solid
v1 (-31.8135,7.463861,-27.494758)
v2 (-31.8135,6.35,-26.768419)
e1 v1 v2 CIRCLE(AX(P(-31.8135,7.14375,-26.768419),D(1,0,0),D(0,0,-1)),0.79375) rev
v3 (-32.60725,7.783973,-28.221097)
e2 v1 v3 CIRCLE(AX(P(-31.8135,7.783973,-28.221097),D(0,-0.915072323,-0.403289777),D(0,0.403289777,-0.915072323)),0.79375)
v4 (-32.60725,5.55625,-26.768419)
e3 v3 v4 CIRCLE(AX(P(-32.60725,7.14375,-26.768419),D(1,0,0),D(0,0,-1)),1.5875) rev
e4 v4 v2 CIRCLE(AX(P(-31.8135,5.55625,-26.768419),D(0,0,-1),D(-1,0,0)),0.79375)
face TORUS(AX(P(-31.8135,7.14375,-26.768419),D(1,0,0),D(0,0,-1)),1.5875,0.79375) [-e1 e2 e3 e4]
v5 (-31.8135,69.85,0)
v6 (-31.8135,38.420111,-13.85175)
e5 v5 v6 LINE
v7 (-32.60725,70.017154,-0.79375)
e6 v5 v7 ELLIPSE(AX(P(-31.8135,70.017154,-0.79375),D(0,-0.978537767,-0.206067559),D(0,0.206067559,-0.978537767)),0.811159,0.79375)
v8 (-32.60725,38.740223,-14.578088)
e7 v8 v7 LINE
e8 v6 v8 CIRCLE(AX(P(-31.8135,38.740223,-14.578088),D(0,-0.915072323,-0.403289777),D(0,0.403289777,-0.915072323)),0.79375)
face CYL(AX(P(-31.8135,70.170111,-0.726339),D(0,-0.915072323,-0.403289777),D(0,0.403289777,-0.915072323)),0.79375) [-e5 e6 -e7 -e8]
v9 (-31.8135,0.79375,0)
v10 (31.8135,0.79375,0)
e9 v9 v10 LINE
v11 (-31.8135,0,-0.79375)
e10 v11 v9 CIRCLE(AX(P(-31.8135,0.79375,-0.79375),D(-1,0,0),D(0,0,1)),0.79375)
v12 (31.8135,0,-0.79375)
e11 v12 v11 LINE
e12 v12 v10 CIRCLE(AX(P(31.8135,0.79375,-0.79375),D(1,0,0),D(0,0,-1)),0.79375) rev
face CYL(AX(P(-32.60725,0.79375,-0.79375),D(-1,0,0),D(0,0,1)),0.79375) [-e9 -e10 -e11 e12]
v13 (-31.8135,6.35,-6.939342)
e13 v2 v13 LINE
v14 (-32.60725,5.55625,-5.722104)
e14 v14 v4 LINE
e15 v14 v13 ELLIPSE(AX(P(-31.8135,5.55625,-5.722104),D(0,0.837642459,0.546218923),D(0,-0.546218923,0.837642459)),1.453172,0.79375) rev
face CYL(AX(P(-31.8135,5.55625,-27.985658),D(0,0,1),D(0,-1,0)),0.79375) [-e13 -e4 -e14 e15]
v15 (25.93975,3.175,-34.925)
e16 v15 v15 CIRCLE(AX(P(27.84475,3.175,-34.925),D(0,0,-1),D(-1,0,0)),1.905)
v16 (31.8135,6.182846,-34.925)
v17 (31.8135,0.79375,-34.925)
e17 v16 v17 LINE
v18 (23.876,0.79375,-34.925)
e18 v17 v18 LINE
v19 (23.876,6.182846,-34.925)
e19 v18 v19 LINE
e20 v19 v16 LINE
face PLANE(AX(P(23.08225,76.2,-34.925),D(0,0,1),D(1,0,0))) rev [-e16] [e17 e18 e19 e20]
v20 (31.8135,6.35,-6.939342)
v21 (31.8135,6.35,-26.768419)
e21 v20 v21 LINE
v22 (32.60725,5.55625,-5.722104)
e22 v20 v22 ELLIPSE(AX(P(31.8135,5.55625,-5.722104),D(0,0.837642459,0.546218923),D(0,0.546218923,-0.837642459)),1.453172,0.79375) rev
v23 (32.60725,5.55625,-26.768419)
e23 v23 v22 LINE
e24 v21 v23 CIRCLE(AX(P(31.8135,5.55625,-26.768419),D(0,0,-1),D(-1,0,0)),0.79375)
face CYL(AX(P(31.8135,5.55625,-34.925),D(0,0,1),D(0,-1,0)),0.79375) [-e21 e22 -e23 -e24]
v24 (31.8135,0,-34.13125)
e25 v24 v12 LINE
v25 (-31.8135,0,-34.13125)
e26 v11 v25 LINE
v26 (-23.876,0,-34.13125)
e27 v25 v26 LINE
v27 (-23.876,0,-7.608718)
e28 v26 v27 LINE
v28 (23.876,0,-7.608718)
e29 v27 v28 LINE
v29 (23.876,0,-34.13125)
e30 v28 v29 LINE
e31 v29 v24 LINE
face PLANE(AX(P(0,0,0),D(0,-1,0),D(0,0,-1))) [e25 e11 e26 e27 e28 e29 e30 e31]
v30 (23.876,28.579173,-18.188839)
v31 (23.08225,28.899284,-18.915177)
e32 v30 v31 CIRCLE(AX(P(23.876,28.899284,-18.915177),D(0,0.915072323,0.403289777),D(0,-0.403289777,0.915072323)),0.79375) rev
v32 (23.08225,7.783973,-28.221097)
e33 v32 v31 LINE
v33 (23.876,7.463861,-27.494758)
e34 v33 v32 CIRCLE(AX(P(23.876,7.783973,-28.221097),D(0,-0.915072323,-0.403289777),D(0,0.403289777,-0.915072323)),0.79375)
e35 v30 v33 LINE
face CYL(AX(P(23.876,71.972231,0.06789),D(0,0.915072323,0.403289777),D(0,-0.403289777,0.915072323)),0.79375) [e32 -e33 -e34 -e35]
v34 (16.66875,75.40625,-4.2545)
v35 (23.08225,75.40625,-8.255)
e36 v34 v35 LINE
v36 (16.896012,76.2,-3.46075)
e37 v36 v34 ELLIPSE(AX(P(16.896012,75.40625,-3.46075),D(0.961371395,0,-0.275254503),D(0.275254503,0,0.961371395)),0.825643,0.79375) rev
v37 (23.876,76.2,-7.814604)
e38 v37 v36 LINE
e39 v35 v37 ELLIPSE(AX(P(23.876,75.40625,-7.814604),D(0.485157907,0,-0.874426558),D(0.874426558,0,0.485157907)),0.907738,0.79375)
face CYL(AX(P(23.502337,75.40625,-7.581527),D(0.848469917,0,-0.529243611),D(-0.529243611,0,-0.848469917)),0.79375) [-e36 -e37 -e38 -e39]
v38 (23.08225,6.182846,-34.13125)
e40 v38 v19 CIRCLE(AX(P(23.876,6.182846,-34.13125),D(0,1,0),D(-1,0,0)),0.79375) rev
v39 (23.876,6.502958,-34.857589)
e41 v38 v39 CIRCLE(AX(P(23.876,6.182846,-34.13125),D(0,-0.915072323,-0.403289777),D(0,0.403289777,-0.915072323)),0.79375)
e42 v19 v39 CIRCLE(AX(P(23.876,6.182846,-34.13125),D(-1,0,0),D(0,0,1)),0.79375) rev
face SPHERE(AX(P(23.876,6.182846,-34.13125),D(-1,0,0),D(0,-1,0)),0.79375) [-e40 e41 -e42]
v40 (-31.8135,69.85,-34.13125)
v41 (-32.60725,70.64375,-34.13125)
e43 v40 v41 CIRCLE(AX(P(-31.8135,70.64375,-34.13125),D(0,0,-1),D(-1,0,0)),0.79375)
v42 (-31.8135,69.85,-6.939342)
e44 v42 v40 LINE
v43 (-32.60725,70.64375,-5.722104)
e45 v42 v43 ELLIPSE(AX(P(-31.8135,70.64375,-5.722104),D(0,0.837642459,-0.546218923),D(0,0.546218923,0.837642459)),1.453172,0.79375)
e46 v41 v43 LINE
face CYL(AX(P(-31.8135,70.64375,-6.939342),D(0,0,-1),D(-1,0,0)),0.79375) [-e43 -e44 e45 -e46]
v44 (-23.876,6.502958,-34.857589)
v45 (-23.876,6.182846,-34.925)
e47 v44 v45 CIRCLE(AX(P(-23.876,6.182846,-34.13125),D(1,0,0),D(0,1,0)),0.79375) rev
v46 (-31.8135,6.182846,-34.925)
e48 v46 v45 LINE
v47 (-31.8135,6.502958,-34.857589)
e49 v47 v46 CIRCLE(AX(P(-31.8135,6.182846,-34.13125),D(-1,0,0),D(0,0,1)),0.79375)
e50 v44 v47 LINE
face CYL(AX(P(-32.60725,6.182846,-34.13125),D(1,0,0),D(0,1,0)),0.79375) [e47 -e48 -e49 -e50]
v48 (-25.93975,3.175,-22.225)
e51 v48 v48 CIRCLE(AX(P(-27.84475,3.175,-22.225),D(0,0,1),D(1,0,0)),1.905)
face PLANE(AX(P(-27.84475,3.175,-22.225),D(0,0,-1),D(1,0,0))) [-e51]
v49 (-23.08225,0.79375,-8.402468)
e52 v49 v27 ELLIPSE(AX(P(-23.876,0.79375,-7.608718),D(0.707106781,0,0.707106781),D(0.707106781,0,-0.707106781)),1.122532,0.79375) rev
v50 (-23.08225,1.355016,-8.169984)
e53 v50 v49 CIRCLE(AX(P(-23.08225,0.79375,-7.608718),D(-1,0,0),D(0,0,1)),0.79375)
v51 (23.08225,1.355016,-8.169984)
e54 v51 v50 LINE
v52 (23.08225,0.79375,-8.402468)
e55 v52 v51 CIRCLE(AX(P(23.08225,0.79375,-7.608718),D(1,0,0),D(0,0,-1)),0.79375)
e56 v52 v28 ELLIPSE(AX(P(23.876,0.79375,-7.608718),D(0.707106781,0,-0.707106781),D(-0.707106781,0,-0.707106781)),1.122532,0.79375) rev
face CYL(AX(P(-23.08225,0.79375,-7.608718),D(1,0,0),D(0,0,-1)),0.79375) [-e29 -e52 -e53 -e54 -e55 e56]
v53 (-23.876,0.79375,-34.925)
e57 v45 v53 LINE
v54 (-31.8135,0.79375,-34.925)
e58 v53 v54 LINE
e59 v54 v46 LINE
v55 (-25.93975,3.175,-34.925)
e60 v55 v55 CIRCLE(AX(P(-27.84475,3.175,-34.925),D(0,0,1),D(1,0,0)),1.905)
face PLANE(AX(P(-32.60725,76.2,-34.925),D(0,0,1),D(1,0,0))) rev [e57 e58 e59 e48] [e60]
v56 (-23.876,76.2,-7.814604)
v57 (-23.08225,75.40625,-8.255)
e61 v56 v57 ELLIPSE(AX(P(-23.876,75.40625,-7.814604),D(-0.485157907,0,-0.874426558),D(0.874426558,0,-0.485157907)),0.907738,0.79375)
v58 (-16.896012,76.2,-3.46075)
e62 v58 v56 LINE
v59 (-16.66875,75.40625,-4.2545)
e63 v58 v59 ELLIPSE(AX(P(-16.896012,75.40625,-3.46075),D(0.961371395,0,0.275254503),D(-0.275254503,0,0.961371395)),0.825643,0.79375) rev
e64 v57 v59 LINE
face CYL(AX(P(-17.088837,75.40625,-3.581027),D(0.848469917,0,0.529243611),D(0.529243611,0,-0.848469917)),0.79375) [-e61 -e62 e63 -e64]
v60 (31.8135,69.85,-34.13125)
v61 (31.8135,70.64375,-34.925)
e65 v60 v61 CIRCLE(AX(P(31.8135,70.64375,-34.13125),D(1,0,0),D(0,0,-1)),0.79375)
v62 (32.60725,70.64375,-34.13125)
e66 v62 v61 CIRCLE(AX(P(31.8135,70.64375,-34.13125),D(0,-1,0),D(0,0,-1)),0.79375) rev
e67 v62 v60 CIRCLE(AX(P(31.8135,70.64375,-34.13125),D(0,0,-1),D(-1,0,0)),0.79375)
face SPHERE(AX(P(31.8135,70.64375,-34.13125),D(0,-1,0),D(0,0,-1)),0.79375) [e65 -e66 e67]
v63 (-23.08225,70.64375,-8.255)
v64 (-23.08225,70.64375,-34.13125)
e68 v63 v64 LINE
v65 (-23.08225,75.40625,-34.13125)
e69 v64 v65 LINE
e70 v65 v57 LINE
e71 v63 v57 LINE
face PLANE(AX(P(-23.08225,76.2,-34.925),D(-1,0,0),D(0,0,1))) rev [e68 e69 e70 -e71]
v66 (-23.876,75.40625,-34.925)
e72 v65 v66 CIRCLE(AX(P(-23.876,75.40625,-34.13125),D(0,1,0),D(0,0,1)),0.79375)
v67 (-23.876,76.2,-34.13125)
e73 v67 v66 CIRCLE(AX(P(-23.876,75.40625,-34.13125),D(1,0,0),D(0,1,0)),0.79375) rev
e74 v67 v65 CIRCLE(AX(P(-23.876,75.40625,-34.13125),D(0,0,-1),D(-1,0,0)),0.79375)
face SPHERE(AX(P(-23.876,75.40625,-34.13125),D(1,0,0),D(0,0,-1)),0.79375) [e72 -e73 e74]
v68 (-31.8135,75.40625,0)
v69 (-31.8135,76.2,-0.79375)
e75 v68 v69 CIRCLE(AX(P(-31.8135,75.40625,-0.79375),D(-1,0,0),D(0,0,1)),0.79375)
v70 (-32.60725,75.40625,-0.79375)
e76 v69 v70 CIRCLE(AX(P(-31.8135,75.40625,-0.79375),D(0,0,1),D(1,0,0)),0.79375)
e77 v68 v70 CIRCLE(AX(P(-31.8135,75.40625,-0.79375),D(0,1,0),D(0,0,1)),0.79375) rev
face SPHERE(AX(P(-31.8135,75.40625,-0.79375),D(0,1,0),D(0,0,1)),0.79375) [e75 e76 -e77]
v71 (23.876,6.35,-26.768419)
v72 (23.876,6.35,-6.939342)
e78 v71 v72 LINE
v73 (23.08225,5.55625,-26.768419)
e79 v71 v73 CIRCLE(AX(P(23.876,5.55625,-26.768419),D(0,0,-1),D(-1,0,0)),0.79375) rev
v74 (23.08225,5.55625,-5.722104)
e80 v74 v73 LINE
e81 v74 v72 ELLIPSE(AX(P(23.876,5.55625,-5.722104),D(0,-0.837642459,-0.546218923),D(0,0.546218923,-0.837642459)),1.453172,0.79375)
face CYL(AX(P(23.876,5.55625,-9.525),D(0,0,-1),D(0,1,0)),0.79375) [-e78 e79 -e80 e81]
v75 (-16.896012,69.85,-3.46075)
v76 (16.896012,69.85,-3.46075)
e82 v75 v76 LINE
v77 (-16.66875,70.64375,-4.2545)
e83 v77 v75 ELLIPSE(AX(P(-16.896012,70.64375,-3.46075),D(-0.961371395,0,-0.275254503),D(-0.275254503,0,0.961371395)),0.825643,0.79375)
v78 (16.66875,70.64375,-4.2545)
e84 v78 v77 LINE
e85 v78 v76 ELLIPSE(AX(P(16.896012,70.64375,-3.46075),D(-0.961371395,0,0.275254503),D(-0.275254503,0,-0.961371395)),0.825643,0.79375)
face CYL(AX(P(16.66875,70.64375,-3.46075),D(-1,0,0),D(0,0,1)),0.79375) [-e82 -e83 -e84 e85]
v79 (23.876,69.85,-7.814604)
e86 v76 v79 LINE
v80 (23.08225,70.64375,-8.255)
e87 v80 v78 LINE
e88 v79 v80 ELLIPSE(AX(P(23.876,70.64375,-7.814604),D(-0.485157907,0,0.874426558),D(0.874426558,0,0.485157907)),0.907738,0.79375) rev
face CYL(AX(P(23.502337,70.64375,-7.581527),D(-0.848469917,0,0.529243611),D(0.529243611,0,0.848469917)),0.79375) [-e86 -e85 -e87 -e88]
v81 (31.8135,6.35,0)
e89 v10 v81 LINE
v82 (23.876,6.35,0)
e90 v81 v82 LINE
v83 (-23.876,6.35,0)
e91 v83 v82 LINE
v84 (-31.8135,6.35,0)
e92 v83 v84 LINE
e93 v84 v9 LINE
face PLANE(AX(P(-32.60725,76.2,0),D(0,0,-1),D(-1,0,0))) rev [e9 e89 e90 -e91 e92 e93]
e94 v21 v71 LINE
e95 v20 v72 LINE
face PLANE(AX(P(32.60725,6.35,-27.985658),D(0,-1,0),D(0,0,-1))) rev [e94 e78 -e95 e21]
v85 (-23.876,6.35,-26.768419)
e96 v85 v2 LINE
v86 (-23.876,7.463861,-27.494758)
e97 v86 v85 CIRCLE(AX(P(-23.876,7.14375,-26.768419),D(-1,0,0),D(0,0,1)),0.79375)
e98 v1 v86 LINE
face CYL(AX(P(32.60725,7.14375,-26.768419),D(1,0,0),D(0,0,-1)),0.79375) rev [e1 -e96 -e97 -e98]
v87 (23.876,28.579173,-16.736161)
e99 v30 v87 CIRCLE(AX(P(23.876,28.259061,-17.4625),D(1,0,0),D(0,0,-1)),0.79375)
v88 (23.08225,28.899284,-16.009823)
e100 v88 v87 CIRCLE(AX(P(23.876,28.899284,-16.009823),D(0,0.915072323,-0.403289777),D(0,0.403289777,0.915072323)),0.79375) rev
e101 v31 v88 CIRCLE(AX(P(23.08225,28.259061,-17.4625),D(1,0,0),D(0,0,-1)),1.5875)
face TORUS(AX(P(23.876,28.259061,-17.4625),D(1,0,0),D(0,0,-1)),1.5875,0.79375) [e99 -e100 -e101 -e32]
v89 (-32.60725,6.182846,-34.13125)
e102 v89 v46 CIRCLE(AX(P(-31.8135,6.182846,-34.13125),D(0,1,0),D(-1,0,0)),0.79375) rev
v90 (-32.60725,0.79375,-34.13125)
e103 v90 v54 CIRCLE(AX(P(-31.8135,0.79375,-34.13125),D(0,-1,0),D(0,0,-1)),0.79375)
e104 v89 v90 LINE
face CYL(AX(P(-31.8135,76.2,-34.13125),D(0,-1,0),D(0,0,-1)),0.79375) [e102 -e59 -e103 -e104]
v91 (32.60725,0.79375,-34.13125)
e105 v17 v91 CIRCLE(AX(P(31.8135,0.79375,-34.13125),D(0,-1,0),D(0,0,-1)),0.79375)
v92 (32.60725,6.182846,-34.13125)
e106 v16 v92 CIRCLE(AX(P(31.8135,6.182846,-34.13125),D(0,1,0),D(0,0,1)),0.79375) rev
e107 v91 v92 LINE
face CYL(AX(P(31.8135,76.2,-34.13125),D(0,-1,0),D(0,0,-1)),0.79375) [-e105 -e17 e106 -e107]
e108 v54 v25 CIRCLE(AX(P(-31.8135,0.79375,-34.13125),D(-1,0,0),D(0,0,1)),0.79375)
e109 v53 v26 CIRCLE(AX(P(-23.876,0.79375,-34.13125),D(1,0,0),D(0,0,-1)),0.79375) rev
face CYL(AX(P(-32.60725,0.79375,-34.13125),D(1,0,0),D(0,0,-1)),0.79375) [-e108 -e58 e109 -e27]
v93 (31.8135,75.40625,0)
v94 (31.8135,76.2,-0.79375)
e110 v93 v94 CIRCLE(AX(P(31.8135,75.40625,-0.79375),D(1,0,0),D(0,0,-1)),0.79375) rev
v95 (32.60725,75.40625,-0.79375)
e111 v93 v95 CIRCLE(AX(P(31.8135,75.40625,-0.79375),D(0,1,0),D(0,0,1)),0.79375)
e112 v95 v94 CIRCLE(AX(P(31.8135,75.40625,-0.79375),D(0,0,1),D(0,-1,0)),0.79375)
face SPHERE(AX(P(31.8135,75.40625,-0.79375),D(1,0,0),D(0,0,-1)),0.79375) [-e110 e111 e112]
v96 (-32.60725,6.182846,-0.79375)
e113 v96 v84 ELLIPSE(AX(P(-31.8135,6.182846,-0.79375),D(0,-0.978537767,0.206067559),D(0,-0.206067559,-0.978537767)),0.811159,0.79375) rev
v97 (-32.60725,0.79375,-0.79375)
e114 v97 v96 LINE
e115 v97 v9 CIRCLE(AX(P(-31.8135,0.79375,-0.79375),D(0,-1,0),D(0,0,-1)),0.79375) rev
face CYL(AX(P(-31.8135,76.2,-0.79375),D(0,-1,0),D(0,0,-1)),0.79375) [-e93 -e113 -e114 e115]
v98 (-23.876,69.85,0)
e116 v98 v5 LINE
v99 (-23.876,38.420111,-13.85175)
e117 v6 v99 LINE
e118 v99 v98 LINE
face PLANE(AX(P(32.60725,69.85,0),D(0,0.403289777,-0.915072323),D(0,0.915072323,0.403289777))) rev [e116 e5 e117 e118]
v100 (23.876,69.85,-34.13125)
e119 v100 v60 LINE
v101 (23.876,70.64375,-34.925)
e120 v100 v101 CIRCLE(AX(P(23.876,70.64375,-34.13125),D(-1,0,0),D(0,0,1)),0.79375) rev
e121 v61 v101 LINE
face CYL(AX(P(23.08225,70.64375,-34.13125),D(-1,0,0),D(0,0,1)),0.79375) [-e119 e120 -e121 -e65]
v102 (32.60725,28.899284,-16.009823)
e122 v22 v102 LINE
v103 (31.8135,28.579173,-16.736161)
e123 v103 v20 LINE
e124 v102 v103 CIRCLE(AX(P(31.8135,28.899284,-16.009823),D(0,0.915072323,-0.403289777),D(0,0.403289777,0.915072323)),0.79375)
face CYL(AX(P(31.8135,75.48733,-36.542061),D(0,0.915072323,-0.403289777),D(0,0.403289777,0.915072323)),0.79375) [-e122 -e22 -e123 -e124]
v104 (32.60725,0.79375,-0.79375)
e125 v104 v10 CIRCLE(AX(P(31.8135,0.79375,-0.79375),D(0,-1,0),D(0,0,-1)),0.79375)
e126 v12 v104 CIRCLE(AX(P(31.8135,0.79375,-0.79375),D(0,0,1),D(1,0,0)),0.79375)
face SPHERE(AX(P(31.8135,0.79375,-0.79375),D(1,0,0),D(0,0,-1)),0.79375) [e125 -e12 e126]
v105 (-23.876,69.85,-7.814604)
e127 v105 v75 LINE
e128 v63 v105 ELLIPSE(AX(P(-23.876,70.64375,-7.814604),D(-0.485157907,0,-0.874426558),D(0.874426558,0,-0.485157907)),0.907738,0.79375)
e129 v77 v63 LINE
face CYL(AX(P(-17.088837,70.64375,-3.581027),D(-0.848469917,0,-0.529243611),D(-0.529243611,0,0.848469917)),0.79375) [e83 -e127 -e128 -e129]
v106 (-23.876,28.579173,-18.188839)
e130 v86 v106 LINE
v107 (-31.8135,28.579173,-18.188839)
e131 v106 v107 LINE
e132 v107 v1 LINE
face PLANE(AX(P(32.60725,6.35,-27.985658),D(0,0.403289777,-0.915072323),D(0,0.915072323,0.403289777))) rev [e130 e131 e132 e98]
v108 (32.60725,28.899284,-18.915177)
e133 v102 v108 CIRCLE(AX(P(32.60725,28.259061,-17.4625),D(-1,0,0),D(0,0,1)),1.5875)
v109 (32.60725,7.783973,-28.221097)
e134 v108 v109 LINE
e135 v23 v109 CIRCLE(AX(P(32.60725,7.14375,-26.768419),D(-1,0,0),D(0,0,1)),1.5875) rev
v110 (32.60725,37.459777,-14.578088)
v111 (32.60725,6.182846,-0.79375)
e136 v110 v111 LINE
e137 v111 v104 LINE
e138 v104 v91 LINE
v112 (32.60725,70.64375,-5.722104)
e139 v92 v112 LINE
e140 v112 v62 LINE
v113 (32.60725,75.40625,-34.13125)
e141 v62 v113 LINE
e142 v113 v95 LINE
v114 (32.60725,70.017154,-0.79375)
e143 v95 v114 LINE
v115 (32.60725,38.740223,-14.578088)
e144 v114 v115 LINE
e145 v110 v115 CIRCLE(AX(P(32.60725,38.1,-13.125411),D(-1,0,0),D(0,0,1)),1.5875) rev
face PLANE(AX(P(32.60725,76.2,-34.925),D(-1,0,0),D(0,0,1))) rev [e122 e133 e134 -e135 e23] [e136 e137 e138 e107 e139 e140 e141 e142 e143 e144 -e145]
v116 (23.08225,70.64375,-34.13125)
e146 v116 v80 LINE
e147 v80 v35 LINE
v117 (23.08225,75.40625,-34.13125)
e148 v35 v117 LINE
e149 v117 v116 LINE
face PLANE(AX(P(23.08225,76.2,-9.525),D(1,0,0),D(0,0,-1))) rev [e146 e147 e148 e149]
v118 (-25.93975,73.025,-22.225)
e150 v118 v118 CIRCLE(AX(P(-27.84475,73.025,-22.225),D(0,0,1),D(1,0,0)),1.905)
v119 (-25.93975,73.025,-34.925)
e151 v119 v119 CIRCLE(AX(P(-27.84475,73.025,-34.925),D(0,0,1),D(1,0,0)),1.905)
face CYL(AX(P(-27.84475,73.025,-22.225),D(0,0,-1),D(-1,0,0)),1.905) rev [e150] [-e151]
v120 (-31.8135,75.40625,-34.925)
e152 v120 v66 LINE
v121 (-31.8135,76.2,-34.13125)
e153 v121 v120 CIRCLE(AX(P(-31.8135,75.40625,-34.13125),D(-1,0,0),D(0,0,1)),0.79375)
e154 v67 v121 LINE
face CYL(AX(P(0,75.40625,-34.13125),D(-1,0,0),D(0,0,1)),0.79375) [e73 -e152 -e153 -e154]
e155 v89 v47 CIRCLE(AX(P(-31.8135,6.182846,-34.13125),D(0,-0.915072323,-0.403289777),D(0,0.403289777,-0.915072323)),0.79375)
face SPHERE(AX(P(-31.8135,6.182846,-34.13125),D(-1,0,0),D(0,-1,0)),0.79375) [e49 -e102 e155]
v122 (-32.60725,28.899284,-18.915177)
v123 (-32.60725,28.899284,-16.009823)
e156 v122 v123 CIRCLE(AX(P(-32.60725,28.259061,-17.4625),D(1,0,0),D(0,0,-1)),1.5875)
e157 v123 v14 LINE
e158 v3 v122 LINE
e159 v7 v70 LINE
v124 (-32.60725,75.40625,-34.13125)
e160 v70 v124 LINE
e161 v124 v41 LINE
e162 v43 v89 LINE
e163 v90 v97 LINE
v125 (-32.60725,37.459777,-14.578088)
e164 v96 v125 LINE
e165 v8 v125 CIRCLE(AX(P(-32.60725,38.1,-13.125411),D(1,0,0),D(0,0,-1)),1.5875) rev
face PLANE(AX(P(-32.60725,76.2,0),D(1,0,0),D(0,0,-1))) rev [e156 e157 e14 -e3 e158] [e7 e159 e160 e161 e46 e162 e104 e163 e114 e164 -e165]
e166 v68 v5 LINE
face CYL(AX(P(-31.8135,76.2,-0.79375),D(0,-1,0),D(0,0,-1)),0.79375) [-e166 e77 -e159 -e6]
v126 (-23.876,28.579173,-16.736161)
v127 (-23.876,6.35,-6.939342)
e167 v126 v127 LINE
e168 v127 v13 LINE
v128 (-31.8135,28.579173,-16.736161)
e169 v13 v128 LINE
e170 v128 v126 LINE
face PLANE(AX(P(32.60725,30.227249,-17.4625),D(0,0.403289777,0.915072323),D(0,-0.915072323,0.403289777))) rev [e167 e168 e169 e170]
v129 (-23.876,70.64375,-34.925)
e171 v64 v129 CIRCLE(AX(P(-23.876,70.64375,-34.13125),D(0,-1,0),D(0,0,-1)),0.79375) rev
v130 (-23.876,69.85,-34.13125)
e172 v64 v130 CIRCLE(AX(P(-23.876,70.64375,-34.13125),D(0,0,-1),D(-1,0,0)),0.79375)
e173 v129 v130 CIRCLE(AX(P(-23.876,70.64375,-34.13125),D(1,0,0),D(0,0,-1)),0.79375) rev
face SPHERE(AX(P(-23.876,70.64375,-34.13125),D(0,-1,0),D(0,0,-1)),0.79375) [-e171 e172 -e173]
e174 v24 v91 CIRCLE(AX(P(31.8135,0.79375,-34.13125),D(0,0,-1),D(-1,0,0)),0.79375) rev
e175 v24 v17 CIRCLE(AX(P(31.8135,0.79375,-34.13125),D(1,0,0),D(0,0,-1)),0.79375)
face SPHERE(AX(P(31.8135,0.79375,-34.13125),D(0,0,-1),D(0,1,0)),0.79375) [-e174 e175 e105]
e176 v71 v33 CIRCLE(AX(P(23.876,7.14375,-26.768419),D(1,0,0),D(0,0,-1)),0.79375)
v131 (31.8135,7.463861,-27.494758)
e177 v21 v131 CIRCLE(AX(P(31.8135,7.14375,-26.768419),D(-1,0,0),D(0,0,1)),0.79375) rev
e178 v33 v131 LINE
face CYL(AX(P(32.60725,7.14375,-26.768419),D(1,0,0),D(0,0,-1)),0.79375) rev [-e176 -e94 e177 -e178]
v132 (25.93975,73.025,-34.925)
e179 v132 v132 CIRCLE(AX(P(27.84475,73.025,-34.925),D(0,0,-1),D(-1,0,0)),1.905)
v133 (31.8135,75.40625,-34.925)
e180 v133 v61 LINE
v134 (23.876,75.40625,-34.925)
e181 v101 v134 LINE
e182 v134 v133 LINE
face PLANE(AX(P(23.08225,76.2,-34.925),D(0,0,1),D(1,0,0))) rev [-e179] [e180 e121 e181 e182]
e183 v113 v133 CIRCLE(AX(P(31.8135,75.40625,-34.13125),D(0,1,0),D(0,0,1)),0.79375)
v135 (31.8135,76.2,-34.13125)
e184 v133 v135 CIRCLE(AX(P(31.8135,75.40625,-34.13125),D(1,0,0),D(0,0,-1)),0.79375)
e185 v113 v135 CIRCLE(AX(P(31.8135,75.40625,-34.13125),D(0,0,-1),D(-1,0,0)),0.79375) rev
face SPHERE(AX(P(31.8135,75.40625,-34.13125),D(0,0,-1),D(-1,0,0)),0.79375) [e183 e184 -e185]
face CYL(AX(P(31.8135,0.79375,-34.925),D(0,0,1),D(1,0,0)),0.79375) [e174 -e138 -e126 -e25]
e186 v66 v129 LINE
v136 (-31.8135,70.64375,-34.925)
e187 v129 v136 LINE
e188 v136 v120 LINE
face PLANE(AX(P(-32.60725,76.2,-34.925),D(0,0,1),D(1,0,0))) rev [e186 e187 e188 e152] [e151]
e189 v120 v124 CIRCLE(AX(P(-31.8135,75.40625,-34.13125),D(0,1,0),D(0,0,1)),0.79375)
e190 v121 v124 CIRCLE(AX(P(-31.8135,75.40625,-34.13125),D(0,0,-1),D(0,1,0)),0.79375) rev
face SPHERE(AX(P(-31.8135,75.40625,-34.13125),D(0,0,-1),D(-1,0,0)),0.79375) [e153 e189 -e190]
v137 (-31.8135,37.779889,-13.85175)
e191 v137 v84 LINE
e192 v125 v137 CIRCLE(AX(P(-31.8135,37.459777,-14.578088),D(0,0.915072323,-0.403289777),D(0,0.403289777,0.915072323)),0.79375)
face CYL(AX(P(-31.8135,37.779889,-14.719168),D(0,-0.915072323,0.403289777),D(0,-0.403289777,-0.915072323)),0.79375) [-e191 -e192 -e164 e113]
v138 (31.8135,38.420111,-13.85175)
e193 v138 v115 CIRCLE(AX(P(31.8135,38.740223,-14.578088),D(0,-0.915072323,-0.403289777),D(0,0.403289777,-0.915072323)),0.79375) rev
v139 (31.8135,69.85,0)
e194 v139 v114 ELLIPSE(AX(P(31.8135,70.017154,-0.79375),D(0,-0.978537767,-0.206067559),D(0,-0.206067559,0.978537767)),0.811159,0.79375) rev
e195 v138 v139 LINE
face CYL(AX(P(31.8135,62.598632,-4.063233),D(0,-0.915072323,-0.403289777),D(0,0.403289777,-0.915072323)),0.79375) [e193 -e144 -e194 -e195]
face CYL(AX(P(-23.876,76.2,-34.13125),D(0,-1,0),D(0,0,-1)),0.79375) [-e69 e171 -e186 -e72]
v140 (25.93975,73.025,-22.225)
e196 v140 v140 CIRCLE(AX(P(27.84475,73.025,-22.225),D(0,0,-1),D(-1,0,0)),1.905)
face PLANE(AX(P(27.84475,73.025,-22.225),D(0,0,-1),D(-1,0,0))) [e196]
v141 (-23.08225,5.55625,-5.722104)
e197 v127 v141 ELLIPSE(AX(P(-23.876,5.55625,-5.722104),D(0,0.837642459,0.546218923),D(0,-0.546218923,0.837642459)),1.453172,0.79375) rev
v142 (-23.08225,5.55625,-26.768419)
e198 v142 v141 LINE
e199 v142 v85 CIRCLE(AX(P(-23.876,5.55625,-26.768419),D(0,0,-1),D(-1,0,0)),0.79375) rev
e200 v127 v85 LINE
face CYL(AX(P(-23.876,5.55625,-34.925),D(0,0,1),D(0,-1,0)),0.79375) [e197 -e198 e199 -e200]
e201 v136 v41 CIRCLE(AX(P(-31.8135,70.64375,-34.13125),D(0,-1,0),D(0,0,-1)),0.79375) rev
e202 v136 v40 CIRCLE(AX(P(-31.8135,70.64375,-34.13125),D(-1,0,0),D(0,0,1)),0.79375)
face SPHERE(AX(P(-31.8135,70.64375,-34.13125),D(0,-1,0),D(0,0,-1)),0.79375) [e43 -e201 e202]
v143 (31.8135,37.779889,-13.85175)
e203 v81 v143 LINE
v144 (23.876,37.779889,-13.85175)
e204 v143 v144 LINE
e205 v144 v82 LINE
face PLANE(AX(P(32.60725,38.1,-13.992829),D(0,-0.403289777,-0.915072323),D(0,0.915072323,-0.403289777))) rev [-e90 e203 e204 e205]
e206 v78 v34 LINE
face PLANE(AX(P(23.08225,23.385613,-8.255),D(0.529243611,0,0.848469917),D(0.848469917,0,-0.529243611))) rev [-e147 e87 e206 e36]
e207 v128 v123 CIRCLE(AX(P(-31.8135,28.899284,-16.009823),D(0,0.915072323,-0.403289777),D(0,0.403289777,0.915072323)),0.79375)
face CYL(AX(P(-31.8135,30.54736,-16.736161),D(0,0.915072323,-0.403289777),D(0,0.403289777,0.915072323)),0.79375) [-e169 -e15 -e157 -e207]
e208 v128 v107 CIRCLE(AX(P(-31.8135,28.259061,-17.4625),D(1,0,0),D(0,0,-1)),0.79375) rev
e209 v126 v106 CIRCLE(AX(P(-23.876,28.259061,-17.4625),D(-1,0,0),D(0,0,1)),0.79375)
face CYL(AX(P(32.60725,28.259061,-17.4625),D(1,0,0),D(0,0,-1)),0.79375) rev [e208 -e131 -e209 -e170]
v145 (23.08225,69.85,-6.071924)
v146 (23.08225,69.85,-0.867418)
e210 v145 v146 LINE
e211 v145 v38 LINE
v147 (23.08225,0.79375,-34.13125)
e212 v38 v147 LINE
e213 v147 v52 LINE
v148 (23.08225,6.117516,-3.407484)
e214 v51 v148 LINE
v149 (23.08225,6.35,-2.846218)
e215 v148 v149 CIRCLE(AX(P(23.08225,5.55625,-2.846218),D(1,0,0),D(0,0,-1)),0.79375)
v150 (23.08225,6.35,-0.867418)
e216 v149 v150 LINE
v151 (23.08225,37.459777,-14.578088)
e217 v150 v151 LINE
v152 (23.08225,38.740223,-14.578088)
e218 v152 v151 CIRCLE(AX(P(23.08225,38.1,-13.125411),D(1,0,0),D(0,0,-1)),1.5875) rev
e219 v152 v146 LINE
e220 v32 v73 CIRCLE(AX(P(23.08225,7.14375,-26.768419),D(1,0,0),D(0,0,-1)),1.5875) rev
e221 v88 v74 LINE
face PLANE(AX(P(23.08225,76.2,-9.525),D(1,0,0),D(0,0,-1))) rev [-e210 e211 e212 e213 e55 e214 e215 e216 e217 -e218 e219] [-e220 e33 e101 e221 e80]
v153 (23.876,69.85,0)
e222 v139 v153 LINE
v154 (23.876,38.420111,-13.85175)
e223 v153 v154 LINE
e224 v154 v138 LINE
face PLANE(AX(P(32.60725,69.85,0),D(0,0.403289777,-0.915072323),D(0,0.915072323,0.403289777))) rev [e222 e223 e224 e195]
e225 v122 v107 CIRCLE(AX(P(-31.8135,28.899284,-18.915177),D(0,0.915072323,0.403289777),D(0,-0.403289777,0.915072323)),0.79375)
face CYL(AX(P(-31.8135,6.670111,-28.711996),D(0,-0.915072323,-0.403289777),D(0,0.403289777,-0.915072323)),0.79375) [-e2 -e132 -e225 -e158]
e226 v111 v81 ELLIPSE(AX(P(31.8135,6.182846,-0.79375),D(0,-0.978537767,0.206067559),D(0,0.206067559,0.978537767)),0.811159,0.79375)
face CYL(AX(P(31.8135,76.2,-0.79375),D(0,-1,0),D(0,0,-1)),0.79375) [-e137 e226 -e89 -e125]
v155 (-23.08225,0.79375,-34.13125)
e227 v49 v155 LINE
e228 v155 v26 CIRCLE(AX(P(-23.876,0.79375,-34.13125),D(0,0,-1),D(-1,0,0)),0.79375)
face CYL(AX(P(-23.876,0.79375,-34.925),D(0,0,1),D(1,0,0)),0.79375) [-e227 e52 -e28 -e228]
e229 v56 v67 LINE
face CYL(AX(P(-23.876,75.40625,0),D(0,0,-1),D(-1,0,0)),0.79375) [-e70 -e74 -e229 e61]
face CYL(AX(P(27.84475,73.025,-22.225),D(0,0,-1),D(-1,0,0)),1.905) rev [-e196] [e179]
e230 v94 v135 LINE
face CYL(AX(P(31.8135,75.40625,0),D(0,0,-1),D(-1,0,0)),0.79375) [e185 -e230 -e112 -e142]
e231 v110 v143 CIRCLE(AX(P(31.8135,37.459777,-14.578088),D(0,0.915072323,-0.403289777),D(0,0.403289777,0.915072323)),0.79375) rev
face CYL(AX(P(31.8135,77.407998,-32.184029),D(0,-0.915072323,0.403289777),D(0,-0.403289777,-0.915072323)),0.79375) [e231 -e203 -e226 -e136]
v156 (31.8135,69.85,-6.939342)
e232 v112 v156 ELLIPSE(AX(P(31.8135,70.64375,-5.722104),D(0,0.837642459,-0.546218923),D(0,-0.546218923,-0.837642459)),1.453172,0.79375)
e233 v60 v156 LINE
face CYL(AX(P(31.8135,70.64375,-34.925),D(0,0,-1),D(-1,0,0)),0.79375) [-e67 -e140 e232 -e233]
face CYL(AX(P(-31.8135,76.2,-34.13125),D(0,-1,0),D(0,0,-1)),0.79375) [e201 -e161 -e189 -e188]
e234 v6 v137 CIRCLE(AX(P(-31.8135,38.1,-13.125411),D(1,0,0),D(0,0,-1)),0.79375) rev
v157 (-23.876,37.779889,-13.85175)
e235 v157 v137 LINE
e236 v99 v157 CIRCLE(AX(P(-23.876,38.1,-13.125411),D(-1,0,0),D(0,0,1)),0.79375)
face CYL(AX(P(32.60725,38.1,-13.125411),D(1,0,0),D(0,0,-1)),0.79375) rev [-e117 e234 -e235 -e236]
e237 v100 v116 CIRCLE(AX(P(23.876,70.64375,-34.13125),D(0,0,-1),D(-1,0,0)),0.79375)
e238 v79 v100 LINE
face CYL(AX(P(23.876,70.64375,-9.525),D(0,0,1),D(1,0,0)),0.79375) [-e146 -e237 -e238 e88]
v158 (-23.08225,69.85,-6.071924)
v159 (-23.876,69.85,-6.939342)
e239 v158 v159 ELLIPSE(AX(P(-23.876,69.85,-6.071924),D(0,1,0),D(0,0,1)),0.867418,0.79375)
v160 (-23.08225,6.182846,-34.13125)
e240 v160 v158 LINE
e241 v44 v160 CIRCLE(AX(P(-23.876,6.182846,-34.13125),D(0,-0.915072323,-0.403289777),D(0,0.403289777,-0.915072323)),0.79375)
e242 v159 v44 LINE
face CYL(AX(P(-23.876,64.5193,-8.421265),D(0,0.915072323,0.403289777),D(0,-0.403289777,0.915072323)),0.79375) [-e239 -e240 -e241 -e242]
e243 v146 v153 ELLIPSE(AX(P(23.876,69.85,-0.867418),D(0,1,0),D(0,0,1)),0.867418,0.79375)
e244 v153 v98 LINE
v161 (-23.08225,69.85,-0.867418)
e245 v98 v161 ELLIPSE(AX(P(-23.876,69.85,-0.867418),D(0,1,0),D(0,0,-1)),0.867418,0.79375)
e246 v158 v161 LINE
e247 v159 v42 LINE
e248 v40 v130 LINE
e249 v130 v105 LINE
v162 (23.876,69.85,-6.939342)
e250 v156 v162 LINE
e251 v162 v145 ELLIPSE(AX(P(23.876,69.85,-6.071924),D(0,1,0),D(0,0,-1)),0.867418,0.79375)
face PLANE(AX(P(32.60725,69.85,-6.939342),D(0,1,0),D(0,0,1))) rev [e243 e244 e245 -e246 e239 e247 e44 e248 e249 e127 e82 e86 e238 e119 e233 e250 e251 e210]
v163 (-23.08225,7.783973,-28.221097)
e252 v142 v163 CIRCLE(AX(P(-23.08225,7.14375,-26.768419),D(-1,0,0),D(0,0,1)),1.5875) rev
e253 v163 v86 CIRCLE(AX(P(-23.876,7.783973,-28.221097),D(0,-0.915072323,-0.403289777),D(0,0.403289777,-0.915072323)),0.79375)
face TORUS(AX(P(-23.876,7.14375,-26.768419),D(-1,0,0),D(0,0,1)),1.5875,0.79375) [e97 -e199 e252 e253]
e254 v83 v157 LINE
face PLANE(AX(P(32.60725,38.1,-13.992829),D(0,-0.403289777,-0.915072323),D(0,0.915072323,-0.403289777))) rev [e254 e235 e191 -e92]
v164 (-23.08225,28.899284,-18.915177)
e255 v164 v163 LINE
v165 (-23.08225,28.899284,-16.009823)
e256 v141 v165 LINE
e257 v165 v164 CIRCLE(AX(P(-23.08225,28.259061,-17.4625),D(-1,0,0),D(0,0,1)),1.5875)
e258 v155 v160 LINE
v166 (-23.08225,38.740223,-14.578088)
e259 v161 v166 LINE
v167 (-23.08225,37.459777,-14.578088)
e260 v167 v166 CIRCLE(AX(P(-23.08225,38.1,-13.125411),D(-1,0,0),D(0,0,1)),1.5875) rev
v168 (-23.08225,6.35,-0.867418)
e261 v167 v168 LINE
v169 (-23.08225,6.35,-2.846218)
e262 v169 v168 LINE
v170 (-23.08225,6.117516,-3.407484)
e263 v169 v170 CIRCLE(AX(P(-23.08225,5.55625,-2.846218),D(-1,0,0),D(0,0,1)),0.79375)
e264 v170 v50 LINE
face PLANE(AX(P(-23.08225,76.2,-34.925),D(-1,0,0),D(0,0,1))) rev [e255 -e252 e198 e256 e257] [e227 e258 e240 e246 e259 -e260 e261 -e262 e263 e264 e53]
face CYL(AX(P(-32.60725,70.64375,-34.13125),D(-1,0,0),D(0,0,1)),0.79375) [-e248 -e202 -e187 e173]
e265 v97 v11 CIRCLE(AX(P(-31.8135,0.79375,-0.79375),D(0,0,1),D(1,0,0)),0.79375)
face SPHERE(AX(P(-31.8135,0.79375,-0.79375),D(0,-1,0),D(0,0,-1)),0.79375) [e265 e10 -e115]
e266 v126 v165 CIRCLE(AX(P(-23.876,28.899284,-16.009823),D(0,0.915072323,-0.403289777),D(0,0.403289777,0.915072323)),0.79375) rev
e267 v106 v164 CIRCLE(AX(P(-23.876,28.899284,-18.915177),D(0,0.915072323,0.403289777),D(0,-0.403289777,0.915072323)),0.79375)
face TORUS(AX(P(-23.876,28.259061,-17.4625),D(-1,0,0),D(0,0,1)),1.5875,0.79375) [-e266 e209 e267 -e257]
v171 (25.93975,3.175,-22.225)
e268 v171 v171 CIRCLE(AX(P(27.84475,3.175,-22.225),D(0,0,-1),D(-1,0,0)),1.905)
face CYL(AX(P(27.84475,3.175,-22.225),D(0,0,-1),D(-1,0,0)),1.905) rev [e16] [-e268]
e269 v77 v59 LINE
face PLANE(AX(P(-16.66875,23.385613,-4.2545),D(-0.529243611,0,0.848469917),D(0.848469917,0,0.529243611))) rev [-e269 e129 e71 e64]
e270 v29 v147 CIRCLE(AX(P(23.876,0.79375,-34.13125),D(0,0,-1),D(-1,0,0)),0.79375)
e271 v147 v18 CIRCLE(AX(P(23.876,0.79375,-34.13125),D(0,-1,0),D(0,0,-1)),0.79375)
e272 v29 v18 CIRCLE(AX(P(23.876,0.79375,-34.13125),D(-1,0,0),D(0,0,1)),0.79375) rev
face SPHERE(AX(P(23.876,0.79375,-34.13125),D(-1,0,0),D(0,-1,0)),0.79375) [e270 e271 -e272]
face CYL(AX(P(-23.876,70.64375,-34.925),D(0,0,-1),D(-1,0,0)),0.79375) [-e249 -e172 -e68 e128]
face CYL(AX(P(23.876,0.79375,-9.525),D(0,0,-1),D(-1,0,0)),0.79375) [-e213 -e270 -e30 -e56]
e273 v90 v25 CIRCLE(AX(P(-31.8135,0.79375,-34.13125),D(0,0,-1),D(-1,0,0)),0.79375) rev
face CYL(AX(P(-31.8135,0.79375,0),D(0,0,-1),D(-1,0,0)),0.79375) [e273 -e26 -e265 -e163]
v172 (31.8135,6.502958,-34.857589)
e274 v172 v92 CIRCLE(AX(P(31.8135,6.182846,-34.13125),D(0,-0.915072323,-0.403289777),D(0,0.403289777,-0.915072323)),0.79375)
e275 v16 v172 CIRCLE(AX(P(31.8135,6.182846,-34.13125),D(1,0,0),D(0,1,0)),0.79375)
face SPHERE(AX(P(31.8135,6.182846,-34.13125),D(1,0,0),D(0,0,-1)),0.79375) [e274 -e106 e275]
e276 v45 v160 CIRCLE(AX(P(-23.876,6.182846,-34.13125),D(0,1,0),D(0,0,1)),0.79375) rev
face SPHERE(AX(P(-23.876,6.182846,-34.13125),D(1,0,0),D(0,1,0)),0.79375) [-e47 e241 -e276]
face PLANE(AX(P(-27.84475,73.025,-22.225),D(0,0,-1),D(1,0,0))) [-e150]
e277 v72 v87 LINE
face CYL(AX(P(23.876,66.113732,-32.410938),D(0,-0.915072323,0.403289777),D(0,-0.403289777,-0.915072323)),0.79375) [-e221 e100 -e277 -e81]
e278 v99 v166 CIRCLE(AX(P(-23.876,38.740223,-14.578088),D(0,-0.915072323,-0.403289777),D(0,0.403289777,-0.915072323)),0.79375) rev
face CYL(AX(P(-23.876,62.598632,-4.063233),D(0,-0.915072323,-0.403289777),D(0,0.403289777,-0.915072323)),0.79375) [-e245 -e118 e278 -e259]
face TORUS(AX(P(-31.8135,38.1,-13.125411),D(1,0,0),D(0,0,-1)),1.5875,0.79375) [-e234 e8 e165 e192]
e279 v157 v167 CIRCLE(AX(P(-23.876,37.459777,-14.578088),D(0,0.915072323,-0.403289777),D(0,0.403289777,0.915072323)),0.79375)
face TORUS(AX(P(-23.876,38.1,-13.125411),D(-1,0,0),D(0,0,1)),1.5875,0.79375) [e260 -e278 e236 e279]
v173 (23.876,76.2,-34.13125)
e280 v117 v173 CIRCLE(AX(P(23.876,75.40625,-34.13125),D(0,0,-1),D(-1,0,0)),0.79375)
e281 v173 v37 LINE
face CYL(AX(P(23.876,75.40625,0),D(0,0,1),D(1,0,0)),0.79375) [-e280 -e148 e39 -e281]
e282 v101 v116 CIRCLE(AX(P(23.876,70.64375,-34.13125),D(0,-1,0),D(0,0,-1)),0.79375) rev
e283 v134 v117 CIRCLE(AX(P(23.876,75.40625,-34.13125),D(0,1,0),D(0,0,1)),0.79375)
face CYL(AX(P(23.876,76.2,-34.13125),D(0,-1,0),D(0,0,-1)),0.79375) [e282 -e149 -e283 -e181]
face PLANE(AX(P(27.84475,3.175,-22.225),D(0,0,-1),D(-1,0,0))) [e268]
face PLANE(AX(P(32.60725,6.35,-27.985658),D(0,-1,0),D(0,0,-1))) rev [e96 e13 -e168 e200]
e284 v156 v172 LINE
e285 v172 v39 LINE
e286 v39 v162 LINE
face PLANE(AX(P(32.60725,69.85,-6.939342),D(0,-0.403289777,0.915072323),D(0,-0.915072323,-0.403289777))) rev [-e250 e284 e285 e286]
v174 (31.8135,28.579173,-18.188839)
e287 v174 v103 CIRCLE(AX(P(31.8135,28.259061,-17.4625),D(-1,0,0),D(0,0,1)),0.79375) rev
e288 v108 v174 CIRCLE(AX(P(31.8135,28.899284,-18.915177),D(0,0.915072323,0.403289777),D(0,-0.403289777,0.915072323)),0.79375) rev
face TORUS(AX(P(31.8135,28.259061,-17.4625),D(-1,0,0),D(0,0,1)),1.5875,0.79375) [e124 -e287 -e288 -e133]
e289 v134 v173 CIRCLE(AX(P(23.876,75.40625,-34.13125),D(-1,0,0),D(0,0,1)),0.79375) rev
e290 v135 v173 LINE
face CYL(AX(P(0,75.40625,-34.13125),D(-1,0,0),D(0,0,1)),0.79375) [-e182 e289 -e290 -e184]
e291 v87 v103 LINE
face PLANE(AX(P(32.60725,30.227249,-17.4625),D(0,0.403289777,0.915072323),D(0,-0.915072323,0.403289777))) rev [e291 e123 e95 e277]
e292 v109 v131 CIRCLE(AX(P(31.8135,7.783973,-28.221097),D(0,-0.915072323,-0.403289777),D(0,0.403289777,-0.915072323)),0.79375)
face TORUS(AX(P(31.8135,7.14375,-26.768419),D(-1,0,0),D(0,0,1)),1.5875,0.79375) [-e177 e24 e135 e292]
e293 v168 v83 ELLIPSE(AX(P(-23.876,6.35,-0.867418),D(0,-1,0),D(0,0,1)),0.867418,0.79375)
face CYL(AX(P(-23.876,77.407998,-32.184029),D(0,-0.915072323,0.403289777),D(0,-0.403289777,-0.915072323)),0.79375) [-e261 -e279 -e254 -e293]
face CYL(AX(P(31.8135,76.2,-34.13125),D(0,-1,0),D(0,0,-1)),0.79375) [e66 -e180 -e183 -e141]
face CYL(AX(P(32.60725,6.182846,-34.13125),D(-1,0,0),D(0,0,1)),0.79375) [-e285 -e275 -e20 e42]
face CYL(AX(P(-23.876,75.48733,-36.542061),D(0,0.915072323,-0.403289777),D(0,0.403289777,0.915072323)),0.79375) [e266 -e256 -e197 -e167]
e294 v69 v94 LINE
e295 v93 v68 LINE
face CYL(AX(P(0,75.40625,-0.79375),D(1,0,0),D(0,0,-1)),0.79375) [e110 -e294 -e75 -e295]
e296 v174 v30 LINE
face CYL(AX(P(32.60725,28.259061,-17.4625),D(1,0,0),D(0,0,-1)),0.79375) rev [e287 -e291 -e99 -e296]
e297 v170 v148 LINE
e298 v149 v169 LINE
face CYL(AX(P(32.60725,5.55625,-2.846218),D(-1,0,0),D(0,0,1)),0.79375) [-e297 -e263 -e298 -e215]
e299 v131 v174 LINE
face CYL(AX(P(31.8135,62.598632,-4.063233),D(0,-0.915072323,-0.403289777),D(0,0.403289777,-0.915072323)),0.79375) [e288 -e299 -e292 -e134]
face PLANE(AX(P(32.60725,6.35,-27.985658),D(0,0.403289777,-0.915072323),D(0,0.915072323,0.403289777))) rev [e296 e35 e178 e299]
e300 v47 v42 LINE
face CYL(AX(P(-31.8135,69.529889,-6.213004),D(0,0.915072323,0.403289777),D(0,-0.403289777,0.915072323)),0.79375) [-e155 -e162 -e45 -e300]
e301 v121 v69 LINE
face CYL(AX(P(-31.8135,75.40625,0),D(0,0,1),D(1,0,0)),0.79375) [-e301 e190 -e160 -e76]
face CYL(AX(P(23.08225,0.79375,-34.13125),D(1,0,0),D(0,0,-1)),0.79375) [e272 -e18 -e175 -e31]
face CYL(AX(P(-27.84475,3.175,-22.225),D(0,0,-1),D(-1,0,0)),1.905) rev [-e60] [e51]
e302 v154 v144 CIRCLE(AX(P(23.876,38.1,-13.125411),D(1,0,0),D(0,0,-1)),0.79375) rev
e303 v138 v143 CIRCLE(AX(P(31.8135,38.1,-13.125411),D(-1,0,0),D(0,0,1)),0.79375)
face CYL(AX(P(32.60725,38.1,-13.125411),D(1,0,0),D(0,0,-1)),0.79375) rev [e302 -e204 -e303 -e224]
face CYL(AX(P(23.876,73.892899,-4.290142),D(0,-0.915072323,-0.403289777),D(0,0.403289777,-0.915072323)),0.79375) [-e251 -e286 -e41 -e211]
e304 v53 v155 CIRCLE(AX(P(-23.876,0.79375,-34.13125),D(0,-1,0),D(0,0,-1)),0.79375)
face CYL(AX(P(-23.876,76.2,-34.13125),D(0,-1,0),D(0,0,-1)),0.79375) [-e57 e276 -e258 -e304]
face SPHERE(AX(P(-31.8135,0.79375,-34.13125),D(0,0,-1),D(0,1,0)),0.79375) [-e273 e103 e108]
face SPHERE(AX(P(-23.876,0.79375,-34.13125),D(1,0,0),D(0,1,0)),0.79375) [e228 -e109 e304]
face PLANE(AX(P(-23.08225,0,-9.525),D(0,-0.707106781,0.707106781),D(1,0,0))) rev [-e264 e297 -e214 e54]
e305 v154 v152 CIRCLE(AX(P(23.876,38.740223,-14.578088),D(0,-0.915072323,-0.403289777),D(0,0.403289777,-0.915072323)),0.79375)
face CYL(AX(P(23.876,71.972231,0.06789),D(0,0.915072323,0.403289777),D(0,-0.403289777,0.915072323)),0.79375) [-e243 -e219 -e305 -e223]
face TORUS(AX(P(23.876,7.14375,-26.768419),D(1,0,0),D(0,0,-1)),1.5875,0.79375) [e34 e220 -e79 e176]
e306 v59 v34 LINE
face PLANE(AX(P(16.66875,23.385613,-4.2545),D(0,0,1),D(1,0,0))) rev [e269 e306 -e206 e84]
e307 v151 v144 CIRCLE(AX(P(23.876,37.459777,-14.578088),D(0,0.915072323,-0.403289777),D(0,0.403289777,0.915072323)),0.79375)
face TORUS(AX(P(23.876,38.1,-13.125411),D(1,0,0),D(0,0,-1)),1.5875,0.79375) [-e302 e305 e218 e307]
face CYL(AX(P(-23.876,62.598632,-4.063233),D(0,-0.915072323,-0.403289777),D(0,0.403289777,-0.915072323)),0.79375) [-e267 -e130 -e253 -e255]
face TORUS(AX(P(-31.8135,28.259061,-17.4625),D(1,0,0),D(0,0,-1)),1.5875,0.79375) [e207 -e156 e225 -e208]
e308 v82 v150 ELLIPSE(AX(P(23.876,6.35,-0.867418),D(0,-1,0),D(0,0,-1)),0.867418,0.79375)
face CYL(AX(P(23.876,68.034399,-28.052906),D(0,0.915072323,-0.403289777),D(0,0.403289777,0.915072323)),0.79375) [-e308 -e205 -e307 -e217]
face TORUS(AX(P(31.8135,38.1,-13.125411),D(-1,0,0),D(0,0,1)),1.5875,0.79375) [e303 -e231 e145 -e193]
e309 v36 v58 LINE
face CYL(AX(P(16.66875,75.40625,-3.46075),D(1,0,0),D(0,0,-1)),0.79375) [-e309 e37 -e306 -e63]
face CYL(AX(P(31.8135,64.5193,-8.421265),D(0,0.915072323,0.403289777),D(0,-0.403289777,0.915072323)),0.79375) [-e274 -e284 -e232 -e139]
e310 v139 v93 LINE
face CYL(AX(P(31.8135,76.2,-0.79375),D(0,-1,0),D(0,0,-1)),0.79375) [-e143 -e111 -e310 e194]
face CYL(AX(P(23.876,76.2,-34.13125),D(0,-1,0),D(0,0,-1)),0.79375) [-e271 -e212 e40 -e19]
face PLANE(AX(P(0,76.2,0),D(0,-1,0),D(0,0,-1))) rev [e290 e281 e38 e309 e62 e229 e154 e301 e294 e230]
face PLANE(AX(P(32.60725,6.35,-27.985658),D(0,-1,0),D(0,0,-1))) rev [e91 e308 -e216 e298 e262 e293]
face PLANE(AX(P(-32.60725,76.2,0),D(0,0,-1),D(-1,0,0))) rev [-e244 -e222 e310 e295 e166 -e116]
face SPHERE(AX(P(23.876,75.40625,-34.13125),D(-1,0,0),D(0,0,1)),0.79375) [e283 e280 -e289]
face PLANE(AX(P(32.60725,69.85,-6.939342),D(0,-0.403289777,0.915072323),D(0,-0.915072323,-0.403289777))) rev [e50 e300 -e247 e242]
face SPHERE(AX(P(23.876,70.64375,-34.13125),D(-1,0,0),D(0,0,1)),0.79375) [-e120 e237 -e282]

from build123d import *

# Parameters (mm, degrees)
BOSS_EXTRUDE1_DEPTH = 76.2
CUT_EXTRUDE2_DEPTH  = 107.203232697
SKETCH6_W           = 46.1645
SKETCH6_H           = 63.5
CUT_EXTRUDE3_DEPTH  = 90.941249589
CHAMFER1_SIZE       = 6.35
SKETCH3_R           = 1.905
CUT_EXTRUDE1_DEPTH  = 12.7
CUT_EXTRUDE4_DEPTH  = 6.35
FILLET1_R           = 0.79375


with BuildPart() as part:
    # Sketch2 → Boss-Extrude1 (new body)
    with BuildSketch(Plane(origin=(0, 0, 0), x_dir=(1, 0, 0), z_dir=(0, 1, 0))):
        Polygon((-32.60725, 0), (32.60725, 0), (32.60725, 34.925), (23.08225, 34.925), (23.08225, 9.525), (-23.08225, 9.525), (-23.08225, 34.925), (-32.60725, 34.925), align=None)
    extrude(amount=BOSS_EXTRUDE1_DEPTH)

    # Sketch5 → Cut-Extrude2 (cut, through all)
    with BuildSketch(Plane.ZY.offset(32.60725)):
        Polygon((-34.925, 38.1), (-34.925, 69.85), (-6.939342218, 69.85), (-34.925, 6.35), align=None)
        Polygon((-27.985657782, 6.35), (-17.4625, 30.227248996), (-6.939342218, 6.35), align=None)
        Polygon((0, 69.85), (0, 6.35), (-13.992828891, 38.1), align=None)
    extrude(amount=-CUT_EXTRUDE2_DEPTH, mode=Mode.SUBTRACT)

    # Sketch6 → Cut-Extrude3 (cut, through all)
    with BuildSketch(Plane.XY):
        with Locations((0, 38.1)):
            Rectangle(SKETCH6_W, SKETCH6_H)
    extrude(amount=-CUT_EXTRUDE3_DEPTH, mode=Mode.SUBTRACT)

    # Chamfer1
    # the kernel refuses this chamfer: 6.35 mm, written as the material it takes off along each edge
    with BuildSketch(Plane(origin=(23.08225, 6.35, -9.525), x_dir=(0, -0.9996219169112966, -0.027495876610585633), z_dir=(-1, 0, 0))) as chamfer1_piece_1:
        Polygon((CHAMFER1_SIZE * 0.999621916911, CHAMFER1_SIZE * 0.0274958766106), (-CHAMFER1_SIZE * 0.0274958766106, CHAMFER1_SIZE * 0.999621916911), (0, 0), align=None)
    extrude(amount=46.1645, mode=Mode.SUBTRACT)

    # Sketch3 → Cut-Extrude1 (cut)
    with BuildSketch(Plane(origin=(0, 0, -34.925), x_dir=(-1, 0, 0), z_dir=(0, 0, -1))):
        with Locations((-27.84475, 73.025)):
            Circle(SKETCH3_R)
        with Locations((-27.84475, 3.175)):
            Circle(SKETCH3_R)
    cut_extrude1 = extrude(amount=-CUT_EXTRUDE1_DEPTH, mode=Mode.SUBTRACT)

    # Mirror1: Cut-Extrude1 across plane
    add(cut_extrude1.mirror(Plane(origin=(0, 0, 0), x_dir=(0, 0, 1), z_dir=(1, 0, 0))), mode=Mode.SUBTRACT)

    # Sketch7 → Cut-Extrude4 (cut)
    with BuildSketch(Plane(origin=(0, 76.2, 0), x_dir=(1, 0, 0), z_dir=(0, 1, 0))):
        Polygon((23.08225, 9.525), (23.08225, 8.255), (16.66875, 4.2545), (-16.66875, 4.2545), (-23.08225, 8.255), (-23.08225, 9.525), align=None)
    extrude(amount=-CUT_EXTRUDE4_DEPTH, mode=Mode.SUBTRACT)

    # Fillet1
    fillet1_edges = [part.edges().sort_by_distance(p)[0] for p in [
        (27.84475, 0, -34.925),
        (32.60725, 0, -17.4625),
        (0, 0, 0),
        (-32.60725, 0, -17.4625),
        (32.60725, 76.2, -17.4625),
        (0, 6.35, -3.175),
        (-32.60725, 73.025, -34.925),
        (-23.08225, 73.025, -34.925),
        (23.08225, 73.025, -34.925),
        (32.60725, 73.025, -34.925),
        (32.60725, 73.025, 0),
        (-32.60725, 73.025, 0),
        (27.84475, 76.2, -34.925),
        (-19.8755, 76.2, -6.25475),
        (0, 76.2, -4.2545),
        (19.8755, 76.2, -6.25475),
        (19.8755, 69.85, -6.25475),
        (0, 69.85, -4.2545),
        (-19.8755, 69.85, -6.25475),
        (23.08225, 76.2, -21.59),
        (-32.60725, 3.175, -34.925),
        (-23.08225, 3.175, -34.925),
        (-27.84475, 6.35, -34.925),
        (-27.84475, 69.85, -34.925),
        (-23.08225, 76.2, -21.59),
        (-23.08225, 53.975, -6.996414446),
        (-23.08225, 22.225, -6.996414446),
        (-23.08225, 18.288624498, -12.200921109),
        (-23.08225, 18.288624498, -22.724078891),
        (-23.08225, 6.35, -17.4625),
        (-27.84475, 76.2, -34.925),
        (23.08225, 3.175, -34.925),
        (32.60725, 3.175, -34.925),
        (32.60725, 3.175, 0),
        (-32.60725, 3.175, 0),
        (-32.60725, 76.2, -17.4625),
        (27.84475, 6.35, -34.925),
        (27.84475, 69.85, -34.925),
        (23.08225, 69.85, -21.59),
        (-23.08225, 69.85, -21.59),
        (32.60725, 69.85, -20.932171109),
        (23.08225, 38.1, -20.932171109),
        (32.60725, 38.1, -20.932171109),
        (-23.08225, 38.1, -20.932171109),
        (-32.60725, 38.1, -20.932171109),
        (-32.60725, 69.85, -20.932171109),
        (23.08225, 6.35, -17.4625),
        (32.60725, 6.35, -17.4625),
        (27.84475, 6.35, -27.985657782),
        (23.08225, 18.288624498, -22.724078891),
        (32.60725, 18.288624498, -22.724078891),
        (-27.84475, 6.35, -27.985657782),
        (27.84475, 30.227248996, -17.4625),
        (23.08225, 18.288624498, -12.200921109),
        (-27.84475, 30.227248996, -17.4625),
        (32.60725, 18.288624498, -12.200921109),
        (-32.60725, 6.35, -17.4625),
        (-32.60725, 18.288624498, -12.200921109),
        (-32.60725, 18.288624498, -22.724078891),
        (23.08225, 22.225, -6.996414446),
        (32.60725, 22.225, -6.996414446),
        (27.84475, 38.1, -13.992828891),
        (23.08225, 53.975, -6.996414446),
        (-27.84475, 38.1, -13.992828891),
        (32.60725, 53.975, -6.996414446),
        (-32.60725, 22.225, -6.996414446),
        (-32.60725, 53.975, -6.996414446),
        (-27.84475, 0, -34.925),
        (0, 76.2, 0),
        (-23.08225, 0, -22.225),
        (0, 0, -9.525),
        (23.08225, 0, -22.225),
    ]]
    fillet(fillet1_edges, radius=FILLET1_R)


solid = part.part
